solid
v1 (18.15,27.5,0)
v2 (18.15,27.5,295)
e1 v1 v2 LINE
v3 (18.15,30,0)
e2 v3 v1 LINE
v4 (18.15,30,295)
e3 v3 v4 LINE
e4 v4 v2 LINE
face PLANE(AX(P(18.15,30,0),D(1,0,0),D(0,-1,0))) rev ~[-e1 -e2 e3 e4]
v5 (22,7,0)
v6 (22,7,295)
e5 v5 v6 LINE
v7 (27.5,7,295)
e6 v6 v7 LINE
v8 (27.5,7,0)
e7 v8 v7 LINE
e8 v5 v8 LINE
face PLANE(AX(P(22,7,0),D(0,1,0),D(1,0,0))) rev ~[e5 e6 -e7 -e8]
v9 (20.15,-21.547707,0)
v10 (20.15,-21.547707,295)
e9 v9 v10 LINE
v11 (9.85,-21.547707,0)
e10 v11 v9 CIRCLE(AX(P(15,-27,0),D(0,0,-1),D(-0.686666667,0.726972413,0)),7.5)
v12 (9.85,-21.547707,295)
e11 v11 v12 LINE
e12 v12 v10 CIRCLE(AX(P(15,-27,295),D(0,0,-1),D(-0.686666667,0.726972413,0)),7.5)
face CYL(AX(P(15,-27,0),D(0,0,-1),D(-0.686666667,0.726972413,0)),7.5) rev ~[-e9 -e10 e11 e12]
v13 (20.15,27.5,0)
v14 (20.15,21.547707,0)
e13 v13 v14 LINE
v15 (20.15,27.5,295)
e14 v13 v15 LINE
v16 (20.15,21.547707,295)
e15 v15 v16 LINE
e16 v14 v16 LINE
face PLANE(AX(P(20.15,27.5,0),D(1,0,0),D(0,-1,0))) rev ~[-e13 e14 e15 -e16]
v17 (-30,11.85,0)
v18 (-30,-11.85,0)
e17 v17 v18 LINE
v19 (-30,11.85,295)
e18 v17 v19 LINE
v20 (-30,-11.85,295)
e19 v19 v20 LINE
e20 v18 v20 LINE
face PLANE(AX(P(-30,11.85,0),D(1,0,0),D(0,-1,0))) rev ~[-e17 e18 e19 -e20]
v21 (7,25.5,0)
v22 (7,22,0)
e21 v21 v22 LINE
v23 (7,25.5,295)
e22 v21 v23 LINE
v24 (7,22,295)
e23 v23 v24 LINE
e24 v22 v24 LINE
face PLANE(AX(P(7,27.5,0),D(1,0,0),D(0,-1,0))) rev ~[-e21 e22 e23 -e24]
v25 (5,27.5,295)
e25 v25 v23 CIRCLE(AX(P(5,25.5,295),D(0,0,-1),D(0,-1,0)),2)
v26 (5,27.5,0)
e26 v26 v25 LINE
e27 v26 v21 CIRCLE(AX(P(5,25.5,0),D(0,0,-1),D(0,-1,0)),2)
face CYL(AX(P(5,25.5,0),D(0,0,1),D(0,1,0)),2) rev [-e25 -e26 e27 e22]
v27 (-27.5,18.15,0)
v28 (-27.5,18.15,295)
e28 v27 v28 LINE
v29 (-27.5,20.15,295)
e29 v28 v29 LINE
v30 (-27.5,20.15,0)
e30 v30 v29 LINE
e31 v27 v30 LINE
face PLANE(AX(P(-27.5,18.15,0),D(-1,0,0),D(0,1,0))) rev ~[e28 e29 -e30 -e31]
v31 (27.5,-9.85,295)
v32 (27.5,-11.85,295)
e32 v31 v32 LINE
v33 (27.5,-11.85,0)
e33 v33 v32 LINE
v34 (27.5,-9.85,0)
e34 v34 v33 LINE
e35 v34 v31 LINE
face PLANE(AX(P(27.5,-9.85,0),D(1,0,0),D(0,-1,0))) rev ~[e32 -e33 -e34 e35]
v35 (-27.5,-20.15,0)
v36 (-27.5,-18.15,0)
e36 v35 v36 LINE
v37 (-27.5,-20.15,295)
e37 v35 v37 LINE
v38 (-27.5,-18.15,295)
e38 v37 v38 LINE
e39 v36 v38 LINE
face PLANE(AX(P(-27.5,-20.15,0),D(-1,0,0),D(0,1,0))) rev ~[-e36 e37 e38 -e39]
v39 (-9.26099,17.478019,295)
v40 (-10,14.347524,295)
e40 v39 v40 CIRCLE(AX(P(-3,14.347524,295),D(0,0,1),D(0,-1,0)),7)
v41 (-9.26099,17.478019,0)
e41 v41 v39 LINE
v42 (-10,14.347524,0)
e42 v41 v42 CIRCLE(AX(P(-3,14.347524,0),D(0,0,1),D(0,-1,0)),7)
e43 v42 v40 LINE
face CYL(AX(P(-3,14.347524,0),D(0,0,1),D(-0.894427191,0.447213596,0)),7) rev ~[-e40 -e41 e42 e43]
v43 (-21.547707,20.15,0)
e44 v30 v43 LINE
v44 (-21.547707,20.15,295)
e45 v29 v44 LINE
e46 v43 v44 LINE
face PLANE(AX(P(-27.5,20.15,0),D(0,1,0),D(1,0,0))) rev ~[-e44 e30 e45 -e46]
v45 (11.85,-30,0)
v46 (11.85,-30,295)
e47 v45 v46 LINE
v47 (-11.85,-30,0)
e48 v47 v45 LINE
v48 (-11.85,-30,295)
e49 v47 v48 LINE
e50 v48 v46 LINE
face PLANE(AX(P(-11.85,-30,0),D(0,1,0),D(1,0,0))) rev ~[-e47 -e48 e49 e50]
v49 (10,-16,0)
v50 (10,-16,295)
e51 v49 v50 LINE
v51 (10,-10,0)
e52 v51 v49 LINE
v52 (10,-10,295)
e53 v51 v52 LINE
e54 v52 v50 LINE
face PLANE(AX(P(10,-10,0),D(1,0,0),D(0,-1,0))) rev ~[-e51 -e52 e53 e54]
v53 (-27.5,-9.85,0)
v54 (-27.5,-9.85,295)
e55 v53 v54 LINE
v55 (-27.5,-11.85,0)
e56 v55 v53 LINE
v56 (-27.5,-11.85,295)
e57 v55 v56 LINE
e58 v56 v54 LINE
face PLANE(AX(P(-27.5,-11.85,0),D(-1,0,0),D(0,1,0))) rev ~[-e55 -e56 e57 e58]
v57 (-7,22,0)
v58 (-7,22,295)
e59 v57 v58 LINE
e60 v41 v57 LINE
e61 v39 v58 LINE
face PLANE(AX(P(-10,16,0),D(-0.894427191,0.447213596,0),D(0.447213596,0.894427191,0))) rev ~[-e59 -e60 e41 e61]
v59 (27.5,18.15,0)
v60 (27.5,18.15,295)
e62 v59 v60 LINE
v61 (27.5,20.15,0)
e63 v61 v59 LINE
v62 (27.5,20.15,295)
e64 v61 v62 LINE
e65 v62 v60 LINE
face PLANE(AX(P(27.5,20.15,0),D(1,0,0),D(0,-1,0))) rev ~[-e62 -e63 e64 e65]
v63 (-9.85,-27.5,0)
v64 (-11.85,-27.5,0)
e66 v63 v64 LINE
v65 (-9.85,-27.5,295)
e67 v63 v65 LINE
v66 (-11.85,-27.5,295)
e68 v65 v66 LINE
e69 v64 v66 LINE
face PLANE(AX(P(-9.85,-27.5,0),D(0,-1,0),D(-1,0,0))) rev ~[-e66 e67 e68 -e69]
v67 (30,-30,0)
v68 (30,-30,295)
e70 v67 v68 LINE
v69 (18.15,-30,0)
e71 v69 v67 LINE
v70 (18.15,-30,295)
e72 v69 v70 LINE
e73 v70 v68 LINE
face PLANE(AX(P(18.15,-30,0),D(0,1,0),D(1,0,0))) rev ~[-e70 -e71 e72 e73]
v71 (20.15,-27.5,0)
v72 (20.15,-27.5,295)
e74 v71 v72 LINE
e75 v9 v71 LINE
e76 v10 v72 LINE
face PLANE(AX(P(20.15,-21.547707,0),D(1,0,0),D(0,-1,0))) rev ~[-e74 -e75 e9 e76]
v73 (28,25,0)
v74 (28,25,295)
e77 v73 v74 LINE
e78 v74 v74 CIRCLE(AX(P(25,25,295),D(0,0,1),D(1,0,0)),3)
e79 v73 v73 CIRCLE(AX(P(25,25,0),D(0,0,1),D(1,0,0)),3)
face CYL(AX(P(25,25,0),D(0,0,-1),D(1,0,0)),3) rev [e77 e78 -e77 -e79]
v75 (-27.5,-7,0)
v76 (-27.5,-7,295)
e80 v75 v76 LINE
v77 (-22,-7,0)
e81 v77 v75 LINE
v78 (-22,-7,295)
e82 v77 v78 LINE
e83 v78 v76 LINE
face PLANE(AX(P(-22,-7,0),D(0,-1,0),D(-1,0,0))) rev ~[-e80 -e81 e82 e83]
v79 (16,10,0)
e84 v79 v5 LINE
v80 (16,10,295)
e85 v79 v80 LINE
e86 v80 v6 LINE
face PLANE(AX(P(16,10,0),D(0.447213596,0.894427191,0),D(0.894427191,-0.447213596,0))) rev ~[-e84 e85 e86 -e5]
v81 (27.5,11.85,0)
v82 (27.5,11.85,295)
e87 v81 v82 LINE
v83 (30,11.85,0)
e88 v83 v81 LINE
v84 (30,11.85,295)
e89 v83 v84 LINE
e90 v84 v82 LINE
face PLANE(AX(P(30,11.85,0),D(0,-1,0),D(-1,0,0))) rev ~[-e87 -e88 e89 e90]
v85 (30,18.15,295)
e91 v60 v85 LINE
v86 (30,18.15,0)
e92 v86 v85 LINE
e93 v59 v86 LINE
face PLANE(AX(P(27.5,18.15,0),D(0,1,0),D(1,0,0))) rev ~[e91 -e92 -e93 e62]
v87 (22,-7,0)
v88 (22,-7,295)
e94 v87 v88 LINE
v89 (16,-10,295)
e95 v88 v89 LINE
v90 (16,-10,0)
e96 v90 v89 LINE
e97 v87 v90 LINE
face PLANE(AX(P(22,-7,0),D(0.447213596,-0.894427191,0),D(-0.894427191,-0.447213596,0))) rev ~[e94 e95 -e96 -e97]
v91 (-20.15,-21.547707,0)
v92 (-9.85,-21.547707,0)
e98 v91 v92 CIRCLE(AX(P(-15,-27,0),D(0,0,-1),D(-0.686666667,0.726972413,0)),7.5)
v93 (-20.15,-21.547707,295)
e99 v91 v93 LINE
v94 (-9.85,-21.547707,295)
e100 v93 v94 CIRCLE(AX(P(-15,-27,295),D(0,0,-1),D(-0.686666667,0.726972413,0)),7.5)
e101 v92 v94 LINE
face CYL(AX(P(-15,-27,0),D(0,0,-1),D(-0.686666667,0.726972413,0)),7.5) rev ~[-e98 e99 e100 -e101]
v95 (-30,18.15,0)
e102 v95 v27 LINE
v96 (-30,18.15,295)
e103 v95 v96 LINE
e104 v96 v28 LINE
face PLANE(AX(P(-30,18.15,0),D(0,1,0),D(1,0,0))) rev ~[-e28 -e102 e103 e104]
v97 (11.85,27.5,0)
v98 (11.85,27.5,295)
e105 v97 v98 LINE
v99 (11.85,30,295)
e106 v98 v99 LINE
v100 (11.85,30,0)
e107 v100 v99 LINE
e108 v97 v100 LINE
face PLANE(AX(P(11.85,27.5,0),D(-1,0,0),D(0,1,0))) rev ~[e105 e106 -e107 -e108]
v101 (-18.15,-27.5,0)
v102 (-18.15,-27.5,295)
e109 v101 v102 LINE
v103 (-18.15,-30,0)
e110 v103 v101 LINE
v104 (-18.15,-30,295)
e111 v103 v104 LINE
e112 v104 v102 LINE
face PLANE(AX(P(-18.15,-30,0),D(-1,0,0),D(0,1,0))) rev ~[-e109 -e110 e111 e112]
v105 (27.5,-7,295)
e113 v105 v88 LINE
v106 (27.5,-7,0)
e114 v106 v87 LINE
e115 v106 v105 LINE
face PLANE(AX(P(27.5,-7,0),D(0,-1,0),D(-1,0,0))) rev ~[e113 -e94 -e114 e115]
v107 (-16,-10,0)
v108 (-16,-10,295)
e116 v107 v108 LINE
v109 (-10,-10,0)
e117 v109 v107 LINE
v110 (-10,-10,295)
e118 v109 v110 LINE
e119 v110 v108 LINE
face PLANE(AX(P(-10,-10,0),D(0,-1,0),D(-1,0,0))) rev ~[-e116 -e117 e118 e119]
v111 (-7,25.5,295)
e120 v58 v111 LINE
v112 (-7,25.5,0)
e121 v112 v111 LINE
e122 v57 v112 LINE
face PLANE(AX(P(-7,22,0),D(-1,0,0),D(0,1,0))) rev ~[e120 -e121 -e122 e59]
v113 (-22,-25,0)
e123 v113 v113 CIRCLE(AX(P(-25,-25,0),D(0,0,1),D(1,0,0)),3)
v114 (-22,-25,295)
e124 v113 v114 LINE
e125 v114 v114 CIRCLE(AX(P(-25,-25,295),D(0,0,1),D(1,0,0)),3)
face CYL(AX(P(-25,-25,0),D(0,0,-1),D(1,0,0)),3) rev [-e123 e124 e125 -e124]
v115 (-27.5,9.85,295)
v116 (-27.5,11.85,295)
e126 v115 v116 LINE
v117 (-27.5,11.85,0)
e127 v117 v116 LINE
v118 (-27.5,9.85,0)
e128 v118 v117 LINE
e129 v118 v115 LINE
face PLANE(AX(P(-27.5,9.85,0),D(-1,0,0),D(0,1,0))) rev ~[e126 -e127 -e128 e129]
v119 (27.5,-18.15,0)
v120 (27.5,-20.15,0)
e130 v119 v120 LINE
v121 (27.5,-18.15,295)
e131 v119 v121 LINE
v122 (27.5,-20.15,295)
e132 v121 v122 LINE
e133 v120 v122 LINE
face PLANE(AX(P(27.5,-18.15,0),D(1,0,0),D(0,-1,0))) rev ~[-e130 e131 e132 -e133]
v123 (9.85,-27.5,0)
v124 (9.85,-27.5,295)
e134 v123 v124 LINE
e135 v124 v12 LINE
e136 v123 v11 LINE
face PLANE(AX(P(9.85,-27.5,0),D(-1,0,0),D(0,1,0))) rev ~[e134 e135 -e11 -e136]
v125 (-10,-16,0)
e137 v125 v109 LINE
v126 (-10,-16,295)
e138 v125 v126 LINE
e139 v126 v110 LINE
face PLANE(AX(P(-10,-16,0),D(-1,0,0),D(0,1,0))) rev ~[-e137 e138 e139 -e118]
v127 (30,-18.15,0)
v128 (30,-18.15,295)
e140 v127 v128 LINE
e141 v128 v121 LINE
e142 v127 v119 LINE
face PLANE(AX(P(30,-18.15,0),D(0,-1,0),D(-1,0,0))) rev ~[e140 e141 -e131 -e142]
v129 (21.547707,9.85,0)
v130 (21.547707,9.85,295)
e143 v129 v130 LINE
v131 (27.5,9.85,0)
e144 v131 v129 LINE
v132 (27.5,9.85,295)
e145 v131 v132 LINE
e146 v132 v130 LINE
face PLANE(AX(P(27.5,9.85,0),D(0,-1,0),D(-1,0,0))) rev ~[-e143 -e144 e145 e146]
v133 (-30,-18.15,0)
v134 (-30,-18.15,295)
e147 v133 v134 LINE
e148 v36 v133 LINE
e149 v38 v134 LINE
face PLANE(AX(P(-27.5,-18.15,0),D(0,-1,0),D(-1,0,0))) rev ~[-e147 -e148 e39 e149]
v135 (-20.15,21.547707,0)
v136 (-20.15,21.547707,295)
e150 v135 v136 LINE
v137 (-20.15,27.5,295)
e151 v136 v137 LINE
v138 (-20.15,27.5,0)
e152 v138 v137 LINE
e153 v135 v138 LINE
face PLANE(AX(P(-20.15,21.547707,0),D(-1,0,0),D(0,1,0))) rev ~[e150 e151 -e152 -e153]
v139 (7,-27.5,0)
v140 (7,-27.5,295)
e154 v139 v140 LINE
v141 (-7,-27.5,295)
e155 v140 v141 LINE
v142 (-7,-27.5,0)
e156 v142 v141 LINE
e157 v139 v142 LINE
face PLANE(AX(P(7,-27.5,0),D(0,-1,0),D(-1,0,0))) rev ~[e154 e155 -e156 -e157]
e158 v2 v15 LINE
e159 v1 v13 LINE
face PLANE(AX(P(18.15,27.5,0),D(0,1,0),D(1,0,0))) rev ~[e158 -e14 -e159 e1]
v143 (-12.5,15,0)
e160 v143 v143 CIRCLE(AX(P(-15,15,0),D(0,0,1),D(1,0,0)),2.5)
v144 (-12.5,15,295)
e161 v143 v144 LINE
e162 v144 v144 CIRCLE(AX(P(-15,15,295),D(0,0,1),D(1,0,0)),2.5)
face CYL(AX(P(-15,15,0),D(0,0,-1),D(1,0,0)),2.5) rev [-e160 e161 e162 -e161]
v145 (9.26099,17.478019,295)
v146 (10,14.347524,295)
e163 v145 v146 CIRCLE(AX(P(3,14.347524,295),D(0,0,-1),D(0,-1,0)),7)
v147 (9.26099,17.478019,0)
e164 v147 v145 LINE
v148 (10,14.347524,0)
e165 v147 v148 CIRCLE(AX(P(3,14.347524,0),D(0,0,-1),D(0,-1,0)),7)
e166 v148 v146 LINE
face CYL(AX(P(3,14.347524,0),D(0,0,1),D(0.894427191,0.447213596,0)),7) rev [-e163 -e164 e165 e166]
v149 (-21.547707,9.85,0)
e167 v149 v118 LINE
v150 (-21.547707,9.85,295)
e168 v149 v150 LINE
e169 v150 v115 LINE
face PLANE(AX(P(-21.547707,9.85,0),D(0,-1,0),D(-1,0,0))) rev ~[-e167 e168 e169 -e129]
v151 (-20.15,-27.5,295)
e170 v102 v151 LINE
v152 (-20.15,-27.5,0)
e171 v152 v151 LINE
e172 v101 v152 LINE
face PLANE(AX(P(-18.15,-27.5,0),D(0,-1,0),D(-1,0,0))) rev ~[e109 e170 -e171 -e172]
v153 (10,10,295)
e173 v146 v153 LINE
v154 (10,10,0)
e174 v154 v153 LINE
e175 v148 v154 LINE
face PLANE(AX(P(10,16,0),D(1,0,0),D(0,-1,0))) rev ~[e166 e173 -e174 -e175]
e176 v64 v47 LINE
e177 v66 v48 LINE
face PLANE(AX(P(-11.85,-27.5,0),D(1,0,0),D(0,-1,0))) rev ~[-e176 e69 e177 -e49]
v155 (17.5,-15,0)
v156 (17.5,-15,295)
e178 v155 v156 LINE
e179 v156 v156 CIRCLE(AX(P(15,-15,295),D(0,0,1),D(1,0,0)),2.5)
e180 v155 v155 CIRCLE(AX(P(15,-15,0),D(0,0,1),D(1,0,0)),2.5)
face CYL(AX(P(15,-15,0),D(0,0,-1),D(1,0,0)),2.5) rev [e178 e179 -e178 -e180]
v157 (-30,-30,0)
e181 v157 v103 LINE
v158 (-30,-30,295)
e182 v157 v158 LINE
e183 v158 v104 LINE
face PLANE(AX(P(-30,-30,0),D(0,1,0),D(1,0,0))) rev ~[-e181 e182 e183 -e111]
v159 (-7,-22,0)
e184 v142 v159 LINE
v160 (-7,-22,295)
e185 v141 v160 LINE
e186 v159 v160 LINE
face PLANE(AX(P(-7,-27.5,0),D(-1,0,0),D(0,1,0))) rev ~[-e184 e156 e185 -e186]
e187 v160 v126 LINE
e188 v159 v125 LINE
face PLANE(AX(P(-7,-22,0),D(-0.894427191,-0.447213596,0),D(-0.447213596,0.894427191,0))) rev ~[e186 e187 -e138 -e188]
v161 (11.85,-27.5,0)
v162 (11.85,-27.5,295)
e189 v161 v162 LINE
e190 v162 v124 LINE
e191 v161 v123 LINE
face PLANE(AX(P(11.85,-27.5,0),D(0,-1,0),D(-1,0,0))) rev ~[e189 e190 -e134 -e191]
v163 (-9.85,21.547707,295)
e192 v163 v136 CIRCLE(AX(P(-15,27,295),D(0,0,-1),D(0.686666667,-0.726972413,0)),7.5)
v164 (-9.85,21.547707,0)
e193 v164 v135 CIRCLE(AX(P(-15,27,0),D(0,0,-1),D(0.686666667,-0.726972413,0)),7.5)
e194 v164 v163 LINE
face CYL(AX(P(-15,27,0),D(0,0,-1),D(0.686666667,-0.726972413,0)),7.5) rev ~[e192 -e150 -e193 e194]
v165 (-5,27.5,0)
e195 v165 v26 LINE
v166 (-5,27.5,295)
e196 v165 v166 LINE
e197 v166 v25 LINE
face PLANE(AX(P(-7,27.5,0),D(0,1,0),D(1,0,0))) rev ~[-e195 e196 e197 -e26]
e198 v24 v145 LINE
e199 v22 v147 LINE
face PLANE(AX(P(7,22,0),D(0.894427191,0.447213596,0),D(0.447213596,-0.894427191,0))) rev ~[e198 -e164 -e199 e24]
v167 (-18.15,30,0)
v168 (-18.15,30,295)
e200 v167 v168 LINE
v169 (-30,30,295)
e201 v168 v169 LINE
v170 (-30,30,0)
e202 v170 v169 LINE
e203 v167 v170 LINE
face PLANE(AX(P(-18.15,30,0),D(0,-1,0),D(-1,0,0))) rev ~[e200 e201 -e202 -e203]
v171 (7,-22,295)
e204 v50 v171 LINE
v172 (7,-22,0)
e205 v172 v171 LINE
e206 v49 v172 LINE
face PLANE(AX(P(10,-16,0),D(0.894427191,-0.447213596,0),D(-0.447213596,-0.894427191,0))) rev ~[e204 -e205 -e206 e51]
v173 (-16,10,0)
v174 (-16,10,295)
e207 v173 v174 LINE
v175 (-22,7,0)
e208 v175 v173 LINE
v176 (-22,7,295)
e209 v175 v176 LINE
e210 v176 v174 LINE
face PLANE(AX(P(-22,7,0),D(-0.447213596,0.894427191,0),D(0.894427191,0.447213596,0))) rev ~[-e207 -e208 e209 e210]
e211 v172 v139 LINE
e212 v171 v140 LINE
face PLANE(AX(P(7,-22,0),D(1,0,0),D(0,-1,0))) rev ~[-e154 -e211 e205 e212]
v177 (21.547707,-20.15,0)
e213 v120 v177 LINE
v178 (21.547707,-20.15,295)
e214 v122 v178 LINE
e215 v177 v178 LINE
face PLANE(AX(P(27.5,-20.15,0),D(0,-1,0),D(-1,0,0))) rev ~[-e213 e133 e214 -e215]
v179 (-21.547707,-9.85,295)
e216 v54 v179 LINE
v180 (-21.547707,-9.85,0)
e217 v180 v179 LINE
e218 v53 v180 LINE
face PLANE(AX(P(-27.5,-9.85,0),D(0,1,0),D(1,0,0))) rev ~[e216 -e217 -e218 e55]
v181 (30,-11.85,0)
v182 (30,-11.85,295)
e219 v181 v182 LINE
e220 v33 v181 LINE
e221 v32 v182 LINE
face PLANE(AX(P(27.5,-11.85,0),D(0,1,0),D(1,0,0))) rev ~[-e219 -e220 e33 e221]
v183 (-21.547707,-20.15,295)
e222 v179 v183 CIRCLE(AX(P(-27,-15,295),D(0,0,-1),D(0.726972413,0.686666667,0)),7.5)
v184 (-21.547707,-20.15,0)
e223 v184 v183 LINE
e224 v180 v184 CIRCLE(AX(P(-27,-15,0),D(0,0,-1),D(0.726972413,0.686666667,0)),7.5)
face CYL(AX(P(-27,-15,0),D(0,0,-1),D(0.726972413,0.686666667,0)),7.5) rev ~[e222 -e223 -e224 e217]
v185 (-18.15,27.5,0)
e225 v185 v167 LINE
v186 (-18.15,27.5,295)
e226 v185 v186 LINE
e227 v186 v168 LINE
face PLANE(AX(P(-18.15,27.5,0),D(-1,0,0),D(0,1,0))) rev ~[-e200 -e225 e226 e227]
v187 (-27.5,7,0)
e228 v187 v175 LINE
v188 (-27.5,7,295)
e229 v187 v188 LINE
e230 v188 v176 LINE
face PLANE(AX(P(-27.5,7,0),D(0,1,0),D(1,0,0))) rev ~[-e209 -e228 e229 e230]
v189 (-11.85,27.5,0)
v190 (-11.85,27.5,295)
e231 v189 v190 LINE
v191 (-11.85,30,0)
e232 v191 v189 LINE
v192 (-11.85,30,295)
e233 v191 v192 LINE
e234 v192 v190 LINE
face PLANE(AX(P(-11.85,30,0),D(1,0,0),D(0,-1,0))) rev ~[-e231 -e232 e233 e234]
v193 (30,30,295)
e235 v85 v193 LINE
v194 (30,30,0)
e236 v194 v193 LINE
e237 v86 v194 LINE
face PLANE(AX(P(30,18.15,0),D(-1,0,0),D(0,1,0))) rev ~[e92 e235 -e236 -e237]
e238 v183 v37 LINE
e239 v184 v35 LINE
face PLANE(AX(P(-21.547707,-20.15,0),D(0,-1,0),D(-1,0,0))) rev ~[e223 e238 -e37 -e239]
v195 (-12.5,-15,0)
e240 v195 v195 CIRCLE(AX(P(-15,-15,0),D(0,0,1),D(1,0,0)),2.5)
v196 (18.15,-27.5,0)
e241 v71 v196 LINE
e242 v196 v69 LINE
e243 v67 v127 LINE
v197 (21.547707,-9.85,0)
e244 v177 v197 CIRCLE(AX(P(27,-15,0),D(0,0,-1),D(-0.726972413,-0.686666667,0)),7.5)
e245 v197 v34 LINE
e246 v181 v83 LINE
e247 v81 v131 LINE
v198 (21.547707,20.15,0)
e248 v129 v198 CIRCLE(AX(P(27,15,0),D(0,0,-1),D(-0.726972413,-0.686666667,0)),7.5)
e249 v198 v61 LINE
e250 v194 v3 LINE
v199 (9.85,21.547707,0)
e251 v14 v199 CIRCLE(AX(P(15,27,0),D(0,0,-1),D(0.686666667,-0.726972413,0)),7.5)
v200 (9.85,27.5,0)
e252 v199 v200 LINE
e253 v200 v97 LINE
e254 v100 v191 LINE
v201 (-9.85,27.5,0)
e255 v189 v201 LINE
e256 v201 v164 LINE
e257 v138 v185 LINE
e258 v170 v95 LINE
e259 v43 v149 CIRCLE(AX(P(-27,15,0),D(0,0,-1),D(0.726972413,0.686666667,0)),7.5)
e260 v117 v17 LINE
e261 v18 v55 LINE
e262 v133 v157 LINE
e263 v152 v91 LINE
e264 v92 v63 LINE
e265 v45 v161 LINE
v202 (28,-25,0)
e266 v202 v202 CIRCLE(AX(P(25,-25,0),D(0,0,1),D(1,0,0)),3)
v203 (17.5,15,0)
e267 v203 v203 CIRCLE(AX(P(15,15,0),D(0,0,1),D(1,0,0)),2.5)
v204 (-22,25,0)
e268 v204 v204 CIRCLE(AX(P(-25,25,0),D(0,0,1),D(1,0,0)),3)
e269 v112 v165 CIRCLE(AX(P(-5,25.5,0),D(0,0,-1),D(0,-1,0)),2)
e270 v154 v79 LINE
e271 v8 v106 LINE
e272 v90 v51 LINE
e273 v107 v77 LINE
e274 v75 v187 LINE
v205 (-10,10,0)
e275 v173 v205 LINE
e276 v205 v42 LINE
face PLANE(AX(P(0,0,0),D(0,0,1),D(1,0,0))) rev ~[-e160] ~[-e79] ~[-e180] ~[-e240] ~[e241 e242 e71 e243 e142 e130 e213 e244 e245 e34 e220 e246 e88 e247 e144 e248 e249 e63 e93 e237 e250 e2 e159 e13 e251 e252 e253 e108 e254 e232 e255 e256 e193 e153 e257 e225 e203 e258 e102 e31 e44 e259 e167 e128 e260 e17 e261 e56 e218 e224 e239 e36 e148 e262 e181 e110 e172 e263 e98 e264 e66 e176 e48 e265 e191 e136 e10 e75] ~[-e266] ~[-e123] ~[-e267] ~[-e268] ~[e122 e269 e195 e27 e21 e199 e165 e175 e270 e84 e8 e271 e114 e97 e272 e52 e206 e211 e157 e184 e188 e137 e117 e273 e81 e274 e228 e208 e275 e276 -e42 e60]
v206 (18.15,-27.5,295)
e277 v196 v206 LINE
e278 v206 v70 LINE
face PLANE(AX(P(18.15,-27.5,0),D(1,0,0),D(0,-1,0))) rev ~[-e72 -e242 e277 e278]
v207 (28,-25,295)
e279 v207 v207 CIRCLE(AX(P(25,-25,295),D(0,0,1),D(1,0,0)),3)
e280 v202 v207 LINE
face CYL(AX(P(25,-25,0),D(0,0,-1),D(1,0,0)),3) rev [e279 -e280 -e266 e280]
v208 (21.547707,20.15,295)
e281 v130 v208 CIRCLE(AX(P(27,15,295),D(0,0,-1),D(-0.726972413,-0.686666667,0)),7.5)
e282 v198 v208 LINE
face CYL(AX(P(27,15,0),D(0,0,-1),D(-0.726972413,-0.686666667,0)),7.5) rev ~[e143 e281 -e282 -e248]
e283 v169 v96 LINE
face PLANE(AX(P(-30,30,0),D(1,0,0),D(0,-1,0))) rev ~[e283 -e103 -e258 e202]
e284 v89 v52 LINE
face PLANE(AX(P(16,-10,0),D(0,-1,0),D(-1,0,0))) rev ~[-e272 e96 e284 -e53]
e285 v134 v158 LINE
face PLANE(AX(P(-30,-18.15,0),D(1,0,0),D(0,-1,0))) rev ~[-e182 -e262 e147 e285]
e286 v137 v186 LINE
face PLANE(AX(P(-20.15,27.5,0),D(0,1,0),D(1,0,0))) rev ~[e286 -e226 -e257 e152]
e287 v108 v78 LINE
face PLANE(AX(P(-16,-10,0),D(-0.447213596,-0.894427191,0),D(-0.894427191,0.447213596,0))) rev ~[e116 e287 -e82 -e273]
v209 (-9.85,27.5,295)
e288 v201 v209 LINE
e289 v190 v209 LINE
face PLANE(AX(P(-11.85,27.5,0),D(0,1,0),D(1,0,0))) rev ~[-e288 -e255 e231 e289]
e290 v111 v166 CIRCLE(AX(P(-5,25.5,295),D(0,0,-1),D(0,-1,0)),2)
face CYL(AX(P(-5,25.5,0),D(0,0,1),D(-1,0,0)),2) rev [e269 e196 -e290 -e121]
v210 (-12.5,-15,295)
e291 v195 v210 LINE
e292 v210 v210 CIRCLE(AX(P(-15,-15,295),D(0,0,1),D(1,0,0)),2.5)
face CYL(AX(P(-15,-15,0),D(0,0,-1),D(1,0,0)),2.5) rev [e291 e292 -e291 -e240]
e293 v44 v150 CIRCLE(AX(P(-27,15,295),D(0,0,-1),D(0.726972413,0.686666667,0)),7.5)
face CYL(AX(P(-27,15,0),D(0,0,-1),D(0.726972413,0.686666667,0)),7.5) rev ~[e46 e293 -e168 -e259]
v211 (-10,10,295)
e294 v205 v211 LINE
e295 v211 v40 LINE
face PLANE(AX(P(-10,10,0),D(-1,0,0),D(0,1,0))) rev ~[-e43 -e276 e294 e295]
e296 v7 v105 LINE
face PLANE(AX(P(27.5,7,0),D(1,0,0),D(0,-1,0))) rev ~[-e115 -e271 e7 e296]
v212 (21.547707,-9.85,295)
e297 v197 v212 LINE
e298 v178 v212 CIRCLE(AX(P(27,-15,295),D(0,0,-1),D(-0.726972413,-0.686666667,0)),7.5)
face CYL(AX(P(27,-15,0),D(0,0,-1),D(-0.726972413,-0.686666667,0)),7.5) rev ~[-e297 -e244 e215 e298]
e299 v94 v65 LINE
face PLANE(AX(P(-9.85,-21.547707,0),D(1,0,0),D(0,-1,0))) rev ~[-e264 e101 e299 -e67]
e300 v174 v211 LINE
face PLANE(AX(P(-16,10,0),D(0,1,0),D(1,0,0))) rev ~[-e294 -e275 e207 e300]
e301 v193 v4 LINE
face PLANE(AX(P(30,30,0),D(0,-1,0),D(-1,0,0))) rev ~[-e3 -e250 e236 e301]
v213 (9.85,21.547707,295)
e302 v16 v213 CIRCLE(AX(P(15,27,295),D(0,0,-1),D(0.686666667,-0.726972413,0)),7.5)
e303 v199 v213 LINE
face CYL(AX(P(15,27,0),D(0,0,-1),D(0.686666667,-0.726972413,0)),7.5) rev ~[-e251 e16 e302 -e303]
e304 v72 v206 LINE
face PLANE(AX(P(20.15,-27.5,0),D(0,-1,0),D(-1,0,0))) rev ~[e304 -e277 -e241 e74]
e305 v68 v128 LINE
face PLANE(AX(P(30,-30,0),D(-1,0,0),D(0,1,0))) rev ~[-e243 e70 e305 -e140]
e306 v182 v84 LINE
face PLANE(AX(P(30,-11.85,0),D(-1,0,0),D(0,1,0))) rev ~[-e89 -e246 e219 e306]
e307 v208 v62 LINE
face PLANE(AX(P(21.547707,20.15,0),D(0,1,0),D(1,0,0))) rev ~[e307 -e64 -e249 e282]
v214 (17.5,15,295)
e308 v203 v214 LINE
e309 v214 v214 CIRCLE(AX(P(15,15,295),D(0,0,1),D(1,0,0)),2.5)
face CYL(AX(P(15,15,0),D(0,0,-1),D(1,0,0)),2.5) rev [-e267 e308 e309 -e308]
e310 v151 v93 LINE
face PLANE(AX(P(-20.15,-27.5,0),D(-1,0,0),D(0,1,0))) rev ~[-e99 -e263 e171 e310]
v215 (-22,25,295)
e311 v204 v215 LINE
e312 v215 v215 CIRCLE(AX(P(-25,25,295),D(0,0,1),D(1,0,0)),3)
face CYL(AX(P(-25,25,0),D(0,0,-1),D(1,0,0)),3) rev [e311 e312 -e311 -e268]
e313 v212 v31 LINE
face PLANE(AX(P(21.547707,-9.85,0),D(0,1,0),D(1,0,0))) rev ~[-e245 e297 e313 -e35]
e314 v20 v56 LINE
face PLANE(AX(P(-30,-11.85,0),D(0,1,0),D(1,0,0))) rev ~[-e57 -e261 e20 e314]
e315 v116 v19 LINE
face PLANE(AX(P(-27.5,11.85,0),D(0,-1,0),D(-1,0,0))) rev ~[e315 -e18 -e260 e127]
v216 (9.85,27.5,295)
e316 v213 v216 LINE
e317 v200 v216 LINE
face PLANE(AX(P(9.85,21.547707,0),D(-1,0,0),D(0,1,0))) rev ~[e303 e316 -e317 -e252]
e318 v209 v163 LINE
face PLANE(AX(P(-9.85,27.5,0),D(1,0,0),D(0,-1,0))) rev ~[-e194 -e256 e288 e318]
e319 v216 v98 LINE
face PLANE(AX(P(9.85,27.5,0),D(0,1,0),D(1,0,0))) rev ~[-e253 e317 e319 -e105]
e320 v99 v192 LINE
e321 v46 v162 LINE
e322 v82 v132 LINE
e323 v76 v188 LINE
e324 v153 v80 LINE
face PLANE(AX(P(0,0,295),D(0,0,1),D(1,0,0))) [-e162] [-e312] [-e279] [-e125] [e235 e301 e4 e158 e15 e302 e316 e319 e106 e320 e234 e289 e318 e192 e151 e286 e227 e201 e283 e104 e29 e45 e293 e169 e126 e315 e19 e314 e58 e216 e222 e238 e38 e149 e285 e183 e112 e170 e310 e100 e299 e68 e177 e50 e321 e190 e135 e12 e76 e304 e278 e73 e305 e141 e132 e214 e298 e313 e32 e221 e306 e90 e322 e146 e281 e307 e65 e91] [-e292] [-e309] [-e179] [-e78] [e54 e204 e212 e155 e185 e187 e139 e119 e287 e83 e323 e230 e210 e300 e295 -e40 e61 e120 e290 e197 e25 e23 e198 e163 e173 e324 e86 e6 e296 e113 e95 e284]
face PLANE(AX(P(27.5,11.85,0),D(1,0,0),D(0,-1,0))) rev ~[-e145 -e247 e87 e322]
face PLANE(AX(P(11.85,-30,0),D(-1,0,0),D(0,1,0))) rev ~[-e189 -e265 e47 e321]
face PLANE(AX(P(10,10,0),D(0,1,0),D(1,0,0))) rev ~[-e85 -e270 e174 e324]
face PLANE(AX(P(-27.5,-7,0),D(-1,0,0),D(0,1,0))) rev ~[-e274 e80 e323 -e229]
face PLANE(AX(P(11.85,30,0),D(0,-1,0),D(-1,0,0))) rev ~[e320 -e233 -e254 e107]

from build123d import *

# Parameters (mm, degrees)
F0_R     = 3
F0_R_2   = 2.5
F1_DEPTH = 295
F2_R     = 2
F3_R     = 7


# Not quite as in the source:
# - a feature names something its author has since deleted; it is built from what else it names


with BuildPart() as f1:
    # F0 (on Top) → F1 (new body)
    with BuildSketch(Plane.XY):
        with BuildLine():
            Line((18.15, -30), (30, -30))
            Line((30, -30), (30, -18.15))
            Line((30, -18.15), (27.5, -18.15))
            Line((27.5, -18.15), (27.5, -20.15))
            Line((27.5, -20.15), (21.5477069044, -20.15))
            ThreePointArc((21.5477069044, -20.15), (19.5, -15), (21.5477069044, -9.85))
            Line((21.5477069044, -9.85), (27.5, -9.85))
            Line((27.5, -9.85), (27.5, -11.85))
            Line((27.5, -11.85), (30, -11.85))
            Line((30, -11.85), (30, 11.85))
            Line((30, 11.85), (27.5, 11.85))
            Line((27.5, 11.85), (27.5, 9.85))
            Line((27.5, 9.85), (21.5477069044, 9.85))
            ThreePointArc((21.5477069044, 9.85), (19.5, 15), (21.5477069044, 20.15))
            Line((21.5477069044, 20.15), (27.5, 20.15))
            Line((27.5, 20.15), (27.5, 18.15))
            Line((27.5, 18.15), (30, 18.15))
            Line((30, 18.15), (30, 30))
            Line((30, 30), (18.15, 30))
            Line((18.15, 30), (18.15, 27.5))
            Line((18.15, 27.5), (20.15, 27.5))
            Line((20.15, 27.5), (20.15, 21.5477069044))
            ThreePointArc((20.15, 21.5477069044), (15, 19.5), (9.85, 21.5477069044))
            Line((9.85, 21.5477069044), (9.85, 27.5))
            Line((9.85, 27.5), (11.85, 27.5))
            Line((11.85, 27.5), (11.85, 30))
            Line((11.85, 30), (-11.85, 30))
            Line((-11.85, 30), (-11.85, 27.5))
            Line((-11.85, 27.5), (-9.85, 27.5))
            Line((-9.85, 27.5), (-9.85, 21.5477069044))
            ThreePointArc((-9.85, 21.5477069044), (-15, 19.5), (-20.15, 21.5477069044))
            Line((-20.15, 21.5477069044), (-20.15, 27.5))
            Line((-20.15, 27.5), (-18.15, 27.5))
            Line((-18.15, 27.5), (-18.15, 30))
            Line((-18.15, 30), (-30, 30))
            Line((-30, 30), (-30, 18.15))
            Line((-30, 18.15), (-27.5, 18.15))
            Line((-27.5, 18.15), (-27.5, 20.15))
            Line((-27.5, 20.15), (-21.5477069044, 20.15))
            ThreePointArc((-21.5477069044, 20.15), (-19.5, 15), (-21.5477069044, 9.85))
            Line((-21.5477069044, 9.85), (-27.5, 9.85))
            Line((-27.5, 9.85), (-27.5, 11.85))
            Line((-27.5, 11.85), (-30, 11.85))
            Line((-30, 11.85), (-30, -11.85))
            Line((-30, -11.85), (-27.5, -11.85))
            Line((-27.5, -11.85), (-27.5, -9.85))
            Line((-27.5, -9.85), (-21.5477069044, -9.85))
            ThreePointArc((-21.5477069044, -9.85), (-19.5, -15), (-21.5477069044, -20.15))
            Line((-21.5477069044, -20.15), (-27.5, -20.15))
            Line((-27.5, -20.15), (-27.5, -18.15))
            Line((-27.5, -18.15), (-30, -18.15))
            Line((-30, -18.15), (-30, -30))
            Line((-30, -30), (-18.15, -30))
            Line((-18.15, -30), (-18.15, -27.5))
            Line((-18.15, -27.5), (-20.15, -27.5))
            Line((-20.15, -27.5), (-20.15, -21.5477069044))
            ThreePointArc((-20.15, -21.5477069044), (-15, -19.5), (-9.85, -21.5477069044))
            Line((-9.85, -21.5477069044), (-9.85, -27.5))
            Line((-9.85, -27.5), (-11.85, -27.5))
            Line((-11.85, -27.5), (-11.85, -30))
            Line((-11.85, -30), (11.85, -30))
            Line((11.85, -30), (11.85, -27.5))
            Line((11.85, -27.5), (9.85, -27.5))
            Line((9.85, -27.5), (9.85, -21.5477069044))
            ThreePointArc((9.85, -21.5477069044), (15, -19.5), (20.15, -21.5477069044))
            Line((20.15, -21.5477069044), (20.15, -27.5))
            Line((20.15, -27.5), (18.15, -27.5))
            Line((18.15, -27.5), (18.15, -30))
        make_face()
        with Locations((-25, -25)):
            Circle(F0_R, mode=Mode.SUBTRACT)
        with Locations((-15, -15)):
            Circle(F0_R_2, mode=Mode.SUBTRACT)
        with Locations((25, -25)):
            Circle(F0_R, mode=Mode.SUBTRACT)
        with Locations((15, -15)):
            Circle(F0_R_2, mode=Mode.SUBTRACT)
        with Locations((-25, 25)):
            Circle(F0_R, mode=Mode.SUBTRACT)
        with Locations((-15, 15)):
            Circle(F0_R_2, mode=Mode.SUBTRACT)
        Polygon((-7, 22), (-7, 27.5), (0, 27.5), (7, 27.5), (7, 22), (10, 16), (10, 10), (16, 10), (22, 7), (27.5, 7), (27.5, 0), (27.5, -7), (22, -7), (16, -10), (10, -10), (10, -16), (7, -22), (7, -27.5), (0, -27.5), (-7, -27.5), (-7, -22), (-10, -16), (-10, -10), (-16, -10), (-22, -7), (-27.5, -7), (-27.5, 0), (-27.5, 7), (-22, 7), (-16, 10), (-10, 10), (-10, 16), align=None, mode=Mode.SUBTRACT)
        with Locations((15, 15)):
            Circle(F0_R_2, mode=Mode.SUBTRACT)
        with Locations((25, 25)):
            Circle(F0_R, mode=Mode.SUBTRACT)
    extrude(amount=F1_DEPTH)

    # F2
    f2_edges = [f1.edges().sort_by_distance(p)[0] for p in [
        (-7, 27.5, 147.5),
        (7, 27.5, 147.5),
    ]]
    fillet(f2_edges, radius=F2_R)

    # F3
    f3_edges = [f1.edges().sort_by_distance(p)[0] for p in [
        (-10, 16, 147.5),
        (10, 16, 147.5),
    ]]
    fillet(f3_edges, radius=F3_R)


solid = f1.part
